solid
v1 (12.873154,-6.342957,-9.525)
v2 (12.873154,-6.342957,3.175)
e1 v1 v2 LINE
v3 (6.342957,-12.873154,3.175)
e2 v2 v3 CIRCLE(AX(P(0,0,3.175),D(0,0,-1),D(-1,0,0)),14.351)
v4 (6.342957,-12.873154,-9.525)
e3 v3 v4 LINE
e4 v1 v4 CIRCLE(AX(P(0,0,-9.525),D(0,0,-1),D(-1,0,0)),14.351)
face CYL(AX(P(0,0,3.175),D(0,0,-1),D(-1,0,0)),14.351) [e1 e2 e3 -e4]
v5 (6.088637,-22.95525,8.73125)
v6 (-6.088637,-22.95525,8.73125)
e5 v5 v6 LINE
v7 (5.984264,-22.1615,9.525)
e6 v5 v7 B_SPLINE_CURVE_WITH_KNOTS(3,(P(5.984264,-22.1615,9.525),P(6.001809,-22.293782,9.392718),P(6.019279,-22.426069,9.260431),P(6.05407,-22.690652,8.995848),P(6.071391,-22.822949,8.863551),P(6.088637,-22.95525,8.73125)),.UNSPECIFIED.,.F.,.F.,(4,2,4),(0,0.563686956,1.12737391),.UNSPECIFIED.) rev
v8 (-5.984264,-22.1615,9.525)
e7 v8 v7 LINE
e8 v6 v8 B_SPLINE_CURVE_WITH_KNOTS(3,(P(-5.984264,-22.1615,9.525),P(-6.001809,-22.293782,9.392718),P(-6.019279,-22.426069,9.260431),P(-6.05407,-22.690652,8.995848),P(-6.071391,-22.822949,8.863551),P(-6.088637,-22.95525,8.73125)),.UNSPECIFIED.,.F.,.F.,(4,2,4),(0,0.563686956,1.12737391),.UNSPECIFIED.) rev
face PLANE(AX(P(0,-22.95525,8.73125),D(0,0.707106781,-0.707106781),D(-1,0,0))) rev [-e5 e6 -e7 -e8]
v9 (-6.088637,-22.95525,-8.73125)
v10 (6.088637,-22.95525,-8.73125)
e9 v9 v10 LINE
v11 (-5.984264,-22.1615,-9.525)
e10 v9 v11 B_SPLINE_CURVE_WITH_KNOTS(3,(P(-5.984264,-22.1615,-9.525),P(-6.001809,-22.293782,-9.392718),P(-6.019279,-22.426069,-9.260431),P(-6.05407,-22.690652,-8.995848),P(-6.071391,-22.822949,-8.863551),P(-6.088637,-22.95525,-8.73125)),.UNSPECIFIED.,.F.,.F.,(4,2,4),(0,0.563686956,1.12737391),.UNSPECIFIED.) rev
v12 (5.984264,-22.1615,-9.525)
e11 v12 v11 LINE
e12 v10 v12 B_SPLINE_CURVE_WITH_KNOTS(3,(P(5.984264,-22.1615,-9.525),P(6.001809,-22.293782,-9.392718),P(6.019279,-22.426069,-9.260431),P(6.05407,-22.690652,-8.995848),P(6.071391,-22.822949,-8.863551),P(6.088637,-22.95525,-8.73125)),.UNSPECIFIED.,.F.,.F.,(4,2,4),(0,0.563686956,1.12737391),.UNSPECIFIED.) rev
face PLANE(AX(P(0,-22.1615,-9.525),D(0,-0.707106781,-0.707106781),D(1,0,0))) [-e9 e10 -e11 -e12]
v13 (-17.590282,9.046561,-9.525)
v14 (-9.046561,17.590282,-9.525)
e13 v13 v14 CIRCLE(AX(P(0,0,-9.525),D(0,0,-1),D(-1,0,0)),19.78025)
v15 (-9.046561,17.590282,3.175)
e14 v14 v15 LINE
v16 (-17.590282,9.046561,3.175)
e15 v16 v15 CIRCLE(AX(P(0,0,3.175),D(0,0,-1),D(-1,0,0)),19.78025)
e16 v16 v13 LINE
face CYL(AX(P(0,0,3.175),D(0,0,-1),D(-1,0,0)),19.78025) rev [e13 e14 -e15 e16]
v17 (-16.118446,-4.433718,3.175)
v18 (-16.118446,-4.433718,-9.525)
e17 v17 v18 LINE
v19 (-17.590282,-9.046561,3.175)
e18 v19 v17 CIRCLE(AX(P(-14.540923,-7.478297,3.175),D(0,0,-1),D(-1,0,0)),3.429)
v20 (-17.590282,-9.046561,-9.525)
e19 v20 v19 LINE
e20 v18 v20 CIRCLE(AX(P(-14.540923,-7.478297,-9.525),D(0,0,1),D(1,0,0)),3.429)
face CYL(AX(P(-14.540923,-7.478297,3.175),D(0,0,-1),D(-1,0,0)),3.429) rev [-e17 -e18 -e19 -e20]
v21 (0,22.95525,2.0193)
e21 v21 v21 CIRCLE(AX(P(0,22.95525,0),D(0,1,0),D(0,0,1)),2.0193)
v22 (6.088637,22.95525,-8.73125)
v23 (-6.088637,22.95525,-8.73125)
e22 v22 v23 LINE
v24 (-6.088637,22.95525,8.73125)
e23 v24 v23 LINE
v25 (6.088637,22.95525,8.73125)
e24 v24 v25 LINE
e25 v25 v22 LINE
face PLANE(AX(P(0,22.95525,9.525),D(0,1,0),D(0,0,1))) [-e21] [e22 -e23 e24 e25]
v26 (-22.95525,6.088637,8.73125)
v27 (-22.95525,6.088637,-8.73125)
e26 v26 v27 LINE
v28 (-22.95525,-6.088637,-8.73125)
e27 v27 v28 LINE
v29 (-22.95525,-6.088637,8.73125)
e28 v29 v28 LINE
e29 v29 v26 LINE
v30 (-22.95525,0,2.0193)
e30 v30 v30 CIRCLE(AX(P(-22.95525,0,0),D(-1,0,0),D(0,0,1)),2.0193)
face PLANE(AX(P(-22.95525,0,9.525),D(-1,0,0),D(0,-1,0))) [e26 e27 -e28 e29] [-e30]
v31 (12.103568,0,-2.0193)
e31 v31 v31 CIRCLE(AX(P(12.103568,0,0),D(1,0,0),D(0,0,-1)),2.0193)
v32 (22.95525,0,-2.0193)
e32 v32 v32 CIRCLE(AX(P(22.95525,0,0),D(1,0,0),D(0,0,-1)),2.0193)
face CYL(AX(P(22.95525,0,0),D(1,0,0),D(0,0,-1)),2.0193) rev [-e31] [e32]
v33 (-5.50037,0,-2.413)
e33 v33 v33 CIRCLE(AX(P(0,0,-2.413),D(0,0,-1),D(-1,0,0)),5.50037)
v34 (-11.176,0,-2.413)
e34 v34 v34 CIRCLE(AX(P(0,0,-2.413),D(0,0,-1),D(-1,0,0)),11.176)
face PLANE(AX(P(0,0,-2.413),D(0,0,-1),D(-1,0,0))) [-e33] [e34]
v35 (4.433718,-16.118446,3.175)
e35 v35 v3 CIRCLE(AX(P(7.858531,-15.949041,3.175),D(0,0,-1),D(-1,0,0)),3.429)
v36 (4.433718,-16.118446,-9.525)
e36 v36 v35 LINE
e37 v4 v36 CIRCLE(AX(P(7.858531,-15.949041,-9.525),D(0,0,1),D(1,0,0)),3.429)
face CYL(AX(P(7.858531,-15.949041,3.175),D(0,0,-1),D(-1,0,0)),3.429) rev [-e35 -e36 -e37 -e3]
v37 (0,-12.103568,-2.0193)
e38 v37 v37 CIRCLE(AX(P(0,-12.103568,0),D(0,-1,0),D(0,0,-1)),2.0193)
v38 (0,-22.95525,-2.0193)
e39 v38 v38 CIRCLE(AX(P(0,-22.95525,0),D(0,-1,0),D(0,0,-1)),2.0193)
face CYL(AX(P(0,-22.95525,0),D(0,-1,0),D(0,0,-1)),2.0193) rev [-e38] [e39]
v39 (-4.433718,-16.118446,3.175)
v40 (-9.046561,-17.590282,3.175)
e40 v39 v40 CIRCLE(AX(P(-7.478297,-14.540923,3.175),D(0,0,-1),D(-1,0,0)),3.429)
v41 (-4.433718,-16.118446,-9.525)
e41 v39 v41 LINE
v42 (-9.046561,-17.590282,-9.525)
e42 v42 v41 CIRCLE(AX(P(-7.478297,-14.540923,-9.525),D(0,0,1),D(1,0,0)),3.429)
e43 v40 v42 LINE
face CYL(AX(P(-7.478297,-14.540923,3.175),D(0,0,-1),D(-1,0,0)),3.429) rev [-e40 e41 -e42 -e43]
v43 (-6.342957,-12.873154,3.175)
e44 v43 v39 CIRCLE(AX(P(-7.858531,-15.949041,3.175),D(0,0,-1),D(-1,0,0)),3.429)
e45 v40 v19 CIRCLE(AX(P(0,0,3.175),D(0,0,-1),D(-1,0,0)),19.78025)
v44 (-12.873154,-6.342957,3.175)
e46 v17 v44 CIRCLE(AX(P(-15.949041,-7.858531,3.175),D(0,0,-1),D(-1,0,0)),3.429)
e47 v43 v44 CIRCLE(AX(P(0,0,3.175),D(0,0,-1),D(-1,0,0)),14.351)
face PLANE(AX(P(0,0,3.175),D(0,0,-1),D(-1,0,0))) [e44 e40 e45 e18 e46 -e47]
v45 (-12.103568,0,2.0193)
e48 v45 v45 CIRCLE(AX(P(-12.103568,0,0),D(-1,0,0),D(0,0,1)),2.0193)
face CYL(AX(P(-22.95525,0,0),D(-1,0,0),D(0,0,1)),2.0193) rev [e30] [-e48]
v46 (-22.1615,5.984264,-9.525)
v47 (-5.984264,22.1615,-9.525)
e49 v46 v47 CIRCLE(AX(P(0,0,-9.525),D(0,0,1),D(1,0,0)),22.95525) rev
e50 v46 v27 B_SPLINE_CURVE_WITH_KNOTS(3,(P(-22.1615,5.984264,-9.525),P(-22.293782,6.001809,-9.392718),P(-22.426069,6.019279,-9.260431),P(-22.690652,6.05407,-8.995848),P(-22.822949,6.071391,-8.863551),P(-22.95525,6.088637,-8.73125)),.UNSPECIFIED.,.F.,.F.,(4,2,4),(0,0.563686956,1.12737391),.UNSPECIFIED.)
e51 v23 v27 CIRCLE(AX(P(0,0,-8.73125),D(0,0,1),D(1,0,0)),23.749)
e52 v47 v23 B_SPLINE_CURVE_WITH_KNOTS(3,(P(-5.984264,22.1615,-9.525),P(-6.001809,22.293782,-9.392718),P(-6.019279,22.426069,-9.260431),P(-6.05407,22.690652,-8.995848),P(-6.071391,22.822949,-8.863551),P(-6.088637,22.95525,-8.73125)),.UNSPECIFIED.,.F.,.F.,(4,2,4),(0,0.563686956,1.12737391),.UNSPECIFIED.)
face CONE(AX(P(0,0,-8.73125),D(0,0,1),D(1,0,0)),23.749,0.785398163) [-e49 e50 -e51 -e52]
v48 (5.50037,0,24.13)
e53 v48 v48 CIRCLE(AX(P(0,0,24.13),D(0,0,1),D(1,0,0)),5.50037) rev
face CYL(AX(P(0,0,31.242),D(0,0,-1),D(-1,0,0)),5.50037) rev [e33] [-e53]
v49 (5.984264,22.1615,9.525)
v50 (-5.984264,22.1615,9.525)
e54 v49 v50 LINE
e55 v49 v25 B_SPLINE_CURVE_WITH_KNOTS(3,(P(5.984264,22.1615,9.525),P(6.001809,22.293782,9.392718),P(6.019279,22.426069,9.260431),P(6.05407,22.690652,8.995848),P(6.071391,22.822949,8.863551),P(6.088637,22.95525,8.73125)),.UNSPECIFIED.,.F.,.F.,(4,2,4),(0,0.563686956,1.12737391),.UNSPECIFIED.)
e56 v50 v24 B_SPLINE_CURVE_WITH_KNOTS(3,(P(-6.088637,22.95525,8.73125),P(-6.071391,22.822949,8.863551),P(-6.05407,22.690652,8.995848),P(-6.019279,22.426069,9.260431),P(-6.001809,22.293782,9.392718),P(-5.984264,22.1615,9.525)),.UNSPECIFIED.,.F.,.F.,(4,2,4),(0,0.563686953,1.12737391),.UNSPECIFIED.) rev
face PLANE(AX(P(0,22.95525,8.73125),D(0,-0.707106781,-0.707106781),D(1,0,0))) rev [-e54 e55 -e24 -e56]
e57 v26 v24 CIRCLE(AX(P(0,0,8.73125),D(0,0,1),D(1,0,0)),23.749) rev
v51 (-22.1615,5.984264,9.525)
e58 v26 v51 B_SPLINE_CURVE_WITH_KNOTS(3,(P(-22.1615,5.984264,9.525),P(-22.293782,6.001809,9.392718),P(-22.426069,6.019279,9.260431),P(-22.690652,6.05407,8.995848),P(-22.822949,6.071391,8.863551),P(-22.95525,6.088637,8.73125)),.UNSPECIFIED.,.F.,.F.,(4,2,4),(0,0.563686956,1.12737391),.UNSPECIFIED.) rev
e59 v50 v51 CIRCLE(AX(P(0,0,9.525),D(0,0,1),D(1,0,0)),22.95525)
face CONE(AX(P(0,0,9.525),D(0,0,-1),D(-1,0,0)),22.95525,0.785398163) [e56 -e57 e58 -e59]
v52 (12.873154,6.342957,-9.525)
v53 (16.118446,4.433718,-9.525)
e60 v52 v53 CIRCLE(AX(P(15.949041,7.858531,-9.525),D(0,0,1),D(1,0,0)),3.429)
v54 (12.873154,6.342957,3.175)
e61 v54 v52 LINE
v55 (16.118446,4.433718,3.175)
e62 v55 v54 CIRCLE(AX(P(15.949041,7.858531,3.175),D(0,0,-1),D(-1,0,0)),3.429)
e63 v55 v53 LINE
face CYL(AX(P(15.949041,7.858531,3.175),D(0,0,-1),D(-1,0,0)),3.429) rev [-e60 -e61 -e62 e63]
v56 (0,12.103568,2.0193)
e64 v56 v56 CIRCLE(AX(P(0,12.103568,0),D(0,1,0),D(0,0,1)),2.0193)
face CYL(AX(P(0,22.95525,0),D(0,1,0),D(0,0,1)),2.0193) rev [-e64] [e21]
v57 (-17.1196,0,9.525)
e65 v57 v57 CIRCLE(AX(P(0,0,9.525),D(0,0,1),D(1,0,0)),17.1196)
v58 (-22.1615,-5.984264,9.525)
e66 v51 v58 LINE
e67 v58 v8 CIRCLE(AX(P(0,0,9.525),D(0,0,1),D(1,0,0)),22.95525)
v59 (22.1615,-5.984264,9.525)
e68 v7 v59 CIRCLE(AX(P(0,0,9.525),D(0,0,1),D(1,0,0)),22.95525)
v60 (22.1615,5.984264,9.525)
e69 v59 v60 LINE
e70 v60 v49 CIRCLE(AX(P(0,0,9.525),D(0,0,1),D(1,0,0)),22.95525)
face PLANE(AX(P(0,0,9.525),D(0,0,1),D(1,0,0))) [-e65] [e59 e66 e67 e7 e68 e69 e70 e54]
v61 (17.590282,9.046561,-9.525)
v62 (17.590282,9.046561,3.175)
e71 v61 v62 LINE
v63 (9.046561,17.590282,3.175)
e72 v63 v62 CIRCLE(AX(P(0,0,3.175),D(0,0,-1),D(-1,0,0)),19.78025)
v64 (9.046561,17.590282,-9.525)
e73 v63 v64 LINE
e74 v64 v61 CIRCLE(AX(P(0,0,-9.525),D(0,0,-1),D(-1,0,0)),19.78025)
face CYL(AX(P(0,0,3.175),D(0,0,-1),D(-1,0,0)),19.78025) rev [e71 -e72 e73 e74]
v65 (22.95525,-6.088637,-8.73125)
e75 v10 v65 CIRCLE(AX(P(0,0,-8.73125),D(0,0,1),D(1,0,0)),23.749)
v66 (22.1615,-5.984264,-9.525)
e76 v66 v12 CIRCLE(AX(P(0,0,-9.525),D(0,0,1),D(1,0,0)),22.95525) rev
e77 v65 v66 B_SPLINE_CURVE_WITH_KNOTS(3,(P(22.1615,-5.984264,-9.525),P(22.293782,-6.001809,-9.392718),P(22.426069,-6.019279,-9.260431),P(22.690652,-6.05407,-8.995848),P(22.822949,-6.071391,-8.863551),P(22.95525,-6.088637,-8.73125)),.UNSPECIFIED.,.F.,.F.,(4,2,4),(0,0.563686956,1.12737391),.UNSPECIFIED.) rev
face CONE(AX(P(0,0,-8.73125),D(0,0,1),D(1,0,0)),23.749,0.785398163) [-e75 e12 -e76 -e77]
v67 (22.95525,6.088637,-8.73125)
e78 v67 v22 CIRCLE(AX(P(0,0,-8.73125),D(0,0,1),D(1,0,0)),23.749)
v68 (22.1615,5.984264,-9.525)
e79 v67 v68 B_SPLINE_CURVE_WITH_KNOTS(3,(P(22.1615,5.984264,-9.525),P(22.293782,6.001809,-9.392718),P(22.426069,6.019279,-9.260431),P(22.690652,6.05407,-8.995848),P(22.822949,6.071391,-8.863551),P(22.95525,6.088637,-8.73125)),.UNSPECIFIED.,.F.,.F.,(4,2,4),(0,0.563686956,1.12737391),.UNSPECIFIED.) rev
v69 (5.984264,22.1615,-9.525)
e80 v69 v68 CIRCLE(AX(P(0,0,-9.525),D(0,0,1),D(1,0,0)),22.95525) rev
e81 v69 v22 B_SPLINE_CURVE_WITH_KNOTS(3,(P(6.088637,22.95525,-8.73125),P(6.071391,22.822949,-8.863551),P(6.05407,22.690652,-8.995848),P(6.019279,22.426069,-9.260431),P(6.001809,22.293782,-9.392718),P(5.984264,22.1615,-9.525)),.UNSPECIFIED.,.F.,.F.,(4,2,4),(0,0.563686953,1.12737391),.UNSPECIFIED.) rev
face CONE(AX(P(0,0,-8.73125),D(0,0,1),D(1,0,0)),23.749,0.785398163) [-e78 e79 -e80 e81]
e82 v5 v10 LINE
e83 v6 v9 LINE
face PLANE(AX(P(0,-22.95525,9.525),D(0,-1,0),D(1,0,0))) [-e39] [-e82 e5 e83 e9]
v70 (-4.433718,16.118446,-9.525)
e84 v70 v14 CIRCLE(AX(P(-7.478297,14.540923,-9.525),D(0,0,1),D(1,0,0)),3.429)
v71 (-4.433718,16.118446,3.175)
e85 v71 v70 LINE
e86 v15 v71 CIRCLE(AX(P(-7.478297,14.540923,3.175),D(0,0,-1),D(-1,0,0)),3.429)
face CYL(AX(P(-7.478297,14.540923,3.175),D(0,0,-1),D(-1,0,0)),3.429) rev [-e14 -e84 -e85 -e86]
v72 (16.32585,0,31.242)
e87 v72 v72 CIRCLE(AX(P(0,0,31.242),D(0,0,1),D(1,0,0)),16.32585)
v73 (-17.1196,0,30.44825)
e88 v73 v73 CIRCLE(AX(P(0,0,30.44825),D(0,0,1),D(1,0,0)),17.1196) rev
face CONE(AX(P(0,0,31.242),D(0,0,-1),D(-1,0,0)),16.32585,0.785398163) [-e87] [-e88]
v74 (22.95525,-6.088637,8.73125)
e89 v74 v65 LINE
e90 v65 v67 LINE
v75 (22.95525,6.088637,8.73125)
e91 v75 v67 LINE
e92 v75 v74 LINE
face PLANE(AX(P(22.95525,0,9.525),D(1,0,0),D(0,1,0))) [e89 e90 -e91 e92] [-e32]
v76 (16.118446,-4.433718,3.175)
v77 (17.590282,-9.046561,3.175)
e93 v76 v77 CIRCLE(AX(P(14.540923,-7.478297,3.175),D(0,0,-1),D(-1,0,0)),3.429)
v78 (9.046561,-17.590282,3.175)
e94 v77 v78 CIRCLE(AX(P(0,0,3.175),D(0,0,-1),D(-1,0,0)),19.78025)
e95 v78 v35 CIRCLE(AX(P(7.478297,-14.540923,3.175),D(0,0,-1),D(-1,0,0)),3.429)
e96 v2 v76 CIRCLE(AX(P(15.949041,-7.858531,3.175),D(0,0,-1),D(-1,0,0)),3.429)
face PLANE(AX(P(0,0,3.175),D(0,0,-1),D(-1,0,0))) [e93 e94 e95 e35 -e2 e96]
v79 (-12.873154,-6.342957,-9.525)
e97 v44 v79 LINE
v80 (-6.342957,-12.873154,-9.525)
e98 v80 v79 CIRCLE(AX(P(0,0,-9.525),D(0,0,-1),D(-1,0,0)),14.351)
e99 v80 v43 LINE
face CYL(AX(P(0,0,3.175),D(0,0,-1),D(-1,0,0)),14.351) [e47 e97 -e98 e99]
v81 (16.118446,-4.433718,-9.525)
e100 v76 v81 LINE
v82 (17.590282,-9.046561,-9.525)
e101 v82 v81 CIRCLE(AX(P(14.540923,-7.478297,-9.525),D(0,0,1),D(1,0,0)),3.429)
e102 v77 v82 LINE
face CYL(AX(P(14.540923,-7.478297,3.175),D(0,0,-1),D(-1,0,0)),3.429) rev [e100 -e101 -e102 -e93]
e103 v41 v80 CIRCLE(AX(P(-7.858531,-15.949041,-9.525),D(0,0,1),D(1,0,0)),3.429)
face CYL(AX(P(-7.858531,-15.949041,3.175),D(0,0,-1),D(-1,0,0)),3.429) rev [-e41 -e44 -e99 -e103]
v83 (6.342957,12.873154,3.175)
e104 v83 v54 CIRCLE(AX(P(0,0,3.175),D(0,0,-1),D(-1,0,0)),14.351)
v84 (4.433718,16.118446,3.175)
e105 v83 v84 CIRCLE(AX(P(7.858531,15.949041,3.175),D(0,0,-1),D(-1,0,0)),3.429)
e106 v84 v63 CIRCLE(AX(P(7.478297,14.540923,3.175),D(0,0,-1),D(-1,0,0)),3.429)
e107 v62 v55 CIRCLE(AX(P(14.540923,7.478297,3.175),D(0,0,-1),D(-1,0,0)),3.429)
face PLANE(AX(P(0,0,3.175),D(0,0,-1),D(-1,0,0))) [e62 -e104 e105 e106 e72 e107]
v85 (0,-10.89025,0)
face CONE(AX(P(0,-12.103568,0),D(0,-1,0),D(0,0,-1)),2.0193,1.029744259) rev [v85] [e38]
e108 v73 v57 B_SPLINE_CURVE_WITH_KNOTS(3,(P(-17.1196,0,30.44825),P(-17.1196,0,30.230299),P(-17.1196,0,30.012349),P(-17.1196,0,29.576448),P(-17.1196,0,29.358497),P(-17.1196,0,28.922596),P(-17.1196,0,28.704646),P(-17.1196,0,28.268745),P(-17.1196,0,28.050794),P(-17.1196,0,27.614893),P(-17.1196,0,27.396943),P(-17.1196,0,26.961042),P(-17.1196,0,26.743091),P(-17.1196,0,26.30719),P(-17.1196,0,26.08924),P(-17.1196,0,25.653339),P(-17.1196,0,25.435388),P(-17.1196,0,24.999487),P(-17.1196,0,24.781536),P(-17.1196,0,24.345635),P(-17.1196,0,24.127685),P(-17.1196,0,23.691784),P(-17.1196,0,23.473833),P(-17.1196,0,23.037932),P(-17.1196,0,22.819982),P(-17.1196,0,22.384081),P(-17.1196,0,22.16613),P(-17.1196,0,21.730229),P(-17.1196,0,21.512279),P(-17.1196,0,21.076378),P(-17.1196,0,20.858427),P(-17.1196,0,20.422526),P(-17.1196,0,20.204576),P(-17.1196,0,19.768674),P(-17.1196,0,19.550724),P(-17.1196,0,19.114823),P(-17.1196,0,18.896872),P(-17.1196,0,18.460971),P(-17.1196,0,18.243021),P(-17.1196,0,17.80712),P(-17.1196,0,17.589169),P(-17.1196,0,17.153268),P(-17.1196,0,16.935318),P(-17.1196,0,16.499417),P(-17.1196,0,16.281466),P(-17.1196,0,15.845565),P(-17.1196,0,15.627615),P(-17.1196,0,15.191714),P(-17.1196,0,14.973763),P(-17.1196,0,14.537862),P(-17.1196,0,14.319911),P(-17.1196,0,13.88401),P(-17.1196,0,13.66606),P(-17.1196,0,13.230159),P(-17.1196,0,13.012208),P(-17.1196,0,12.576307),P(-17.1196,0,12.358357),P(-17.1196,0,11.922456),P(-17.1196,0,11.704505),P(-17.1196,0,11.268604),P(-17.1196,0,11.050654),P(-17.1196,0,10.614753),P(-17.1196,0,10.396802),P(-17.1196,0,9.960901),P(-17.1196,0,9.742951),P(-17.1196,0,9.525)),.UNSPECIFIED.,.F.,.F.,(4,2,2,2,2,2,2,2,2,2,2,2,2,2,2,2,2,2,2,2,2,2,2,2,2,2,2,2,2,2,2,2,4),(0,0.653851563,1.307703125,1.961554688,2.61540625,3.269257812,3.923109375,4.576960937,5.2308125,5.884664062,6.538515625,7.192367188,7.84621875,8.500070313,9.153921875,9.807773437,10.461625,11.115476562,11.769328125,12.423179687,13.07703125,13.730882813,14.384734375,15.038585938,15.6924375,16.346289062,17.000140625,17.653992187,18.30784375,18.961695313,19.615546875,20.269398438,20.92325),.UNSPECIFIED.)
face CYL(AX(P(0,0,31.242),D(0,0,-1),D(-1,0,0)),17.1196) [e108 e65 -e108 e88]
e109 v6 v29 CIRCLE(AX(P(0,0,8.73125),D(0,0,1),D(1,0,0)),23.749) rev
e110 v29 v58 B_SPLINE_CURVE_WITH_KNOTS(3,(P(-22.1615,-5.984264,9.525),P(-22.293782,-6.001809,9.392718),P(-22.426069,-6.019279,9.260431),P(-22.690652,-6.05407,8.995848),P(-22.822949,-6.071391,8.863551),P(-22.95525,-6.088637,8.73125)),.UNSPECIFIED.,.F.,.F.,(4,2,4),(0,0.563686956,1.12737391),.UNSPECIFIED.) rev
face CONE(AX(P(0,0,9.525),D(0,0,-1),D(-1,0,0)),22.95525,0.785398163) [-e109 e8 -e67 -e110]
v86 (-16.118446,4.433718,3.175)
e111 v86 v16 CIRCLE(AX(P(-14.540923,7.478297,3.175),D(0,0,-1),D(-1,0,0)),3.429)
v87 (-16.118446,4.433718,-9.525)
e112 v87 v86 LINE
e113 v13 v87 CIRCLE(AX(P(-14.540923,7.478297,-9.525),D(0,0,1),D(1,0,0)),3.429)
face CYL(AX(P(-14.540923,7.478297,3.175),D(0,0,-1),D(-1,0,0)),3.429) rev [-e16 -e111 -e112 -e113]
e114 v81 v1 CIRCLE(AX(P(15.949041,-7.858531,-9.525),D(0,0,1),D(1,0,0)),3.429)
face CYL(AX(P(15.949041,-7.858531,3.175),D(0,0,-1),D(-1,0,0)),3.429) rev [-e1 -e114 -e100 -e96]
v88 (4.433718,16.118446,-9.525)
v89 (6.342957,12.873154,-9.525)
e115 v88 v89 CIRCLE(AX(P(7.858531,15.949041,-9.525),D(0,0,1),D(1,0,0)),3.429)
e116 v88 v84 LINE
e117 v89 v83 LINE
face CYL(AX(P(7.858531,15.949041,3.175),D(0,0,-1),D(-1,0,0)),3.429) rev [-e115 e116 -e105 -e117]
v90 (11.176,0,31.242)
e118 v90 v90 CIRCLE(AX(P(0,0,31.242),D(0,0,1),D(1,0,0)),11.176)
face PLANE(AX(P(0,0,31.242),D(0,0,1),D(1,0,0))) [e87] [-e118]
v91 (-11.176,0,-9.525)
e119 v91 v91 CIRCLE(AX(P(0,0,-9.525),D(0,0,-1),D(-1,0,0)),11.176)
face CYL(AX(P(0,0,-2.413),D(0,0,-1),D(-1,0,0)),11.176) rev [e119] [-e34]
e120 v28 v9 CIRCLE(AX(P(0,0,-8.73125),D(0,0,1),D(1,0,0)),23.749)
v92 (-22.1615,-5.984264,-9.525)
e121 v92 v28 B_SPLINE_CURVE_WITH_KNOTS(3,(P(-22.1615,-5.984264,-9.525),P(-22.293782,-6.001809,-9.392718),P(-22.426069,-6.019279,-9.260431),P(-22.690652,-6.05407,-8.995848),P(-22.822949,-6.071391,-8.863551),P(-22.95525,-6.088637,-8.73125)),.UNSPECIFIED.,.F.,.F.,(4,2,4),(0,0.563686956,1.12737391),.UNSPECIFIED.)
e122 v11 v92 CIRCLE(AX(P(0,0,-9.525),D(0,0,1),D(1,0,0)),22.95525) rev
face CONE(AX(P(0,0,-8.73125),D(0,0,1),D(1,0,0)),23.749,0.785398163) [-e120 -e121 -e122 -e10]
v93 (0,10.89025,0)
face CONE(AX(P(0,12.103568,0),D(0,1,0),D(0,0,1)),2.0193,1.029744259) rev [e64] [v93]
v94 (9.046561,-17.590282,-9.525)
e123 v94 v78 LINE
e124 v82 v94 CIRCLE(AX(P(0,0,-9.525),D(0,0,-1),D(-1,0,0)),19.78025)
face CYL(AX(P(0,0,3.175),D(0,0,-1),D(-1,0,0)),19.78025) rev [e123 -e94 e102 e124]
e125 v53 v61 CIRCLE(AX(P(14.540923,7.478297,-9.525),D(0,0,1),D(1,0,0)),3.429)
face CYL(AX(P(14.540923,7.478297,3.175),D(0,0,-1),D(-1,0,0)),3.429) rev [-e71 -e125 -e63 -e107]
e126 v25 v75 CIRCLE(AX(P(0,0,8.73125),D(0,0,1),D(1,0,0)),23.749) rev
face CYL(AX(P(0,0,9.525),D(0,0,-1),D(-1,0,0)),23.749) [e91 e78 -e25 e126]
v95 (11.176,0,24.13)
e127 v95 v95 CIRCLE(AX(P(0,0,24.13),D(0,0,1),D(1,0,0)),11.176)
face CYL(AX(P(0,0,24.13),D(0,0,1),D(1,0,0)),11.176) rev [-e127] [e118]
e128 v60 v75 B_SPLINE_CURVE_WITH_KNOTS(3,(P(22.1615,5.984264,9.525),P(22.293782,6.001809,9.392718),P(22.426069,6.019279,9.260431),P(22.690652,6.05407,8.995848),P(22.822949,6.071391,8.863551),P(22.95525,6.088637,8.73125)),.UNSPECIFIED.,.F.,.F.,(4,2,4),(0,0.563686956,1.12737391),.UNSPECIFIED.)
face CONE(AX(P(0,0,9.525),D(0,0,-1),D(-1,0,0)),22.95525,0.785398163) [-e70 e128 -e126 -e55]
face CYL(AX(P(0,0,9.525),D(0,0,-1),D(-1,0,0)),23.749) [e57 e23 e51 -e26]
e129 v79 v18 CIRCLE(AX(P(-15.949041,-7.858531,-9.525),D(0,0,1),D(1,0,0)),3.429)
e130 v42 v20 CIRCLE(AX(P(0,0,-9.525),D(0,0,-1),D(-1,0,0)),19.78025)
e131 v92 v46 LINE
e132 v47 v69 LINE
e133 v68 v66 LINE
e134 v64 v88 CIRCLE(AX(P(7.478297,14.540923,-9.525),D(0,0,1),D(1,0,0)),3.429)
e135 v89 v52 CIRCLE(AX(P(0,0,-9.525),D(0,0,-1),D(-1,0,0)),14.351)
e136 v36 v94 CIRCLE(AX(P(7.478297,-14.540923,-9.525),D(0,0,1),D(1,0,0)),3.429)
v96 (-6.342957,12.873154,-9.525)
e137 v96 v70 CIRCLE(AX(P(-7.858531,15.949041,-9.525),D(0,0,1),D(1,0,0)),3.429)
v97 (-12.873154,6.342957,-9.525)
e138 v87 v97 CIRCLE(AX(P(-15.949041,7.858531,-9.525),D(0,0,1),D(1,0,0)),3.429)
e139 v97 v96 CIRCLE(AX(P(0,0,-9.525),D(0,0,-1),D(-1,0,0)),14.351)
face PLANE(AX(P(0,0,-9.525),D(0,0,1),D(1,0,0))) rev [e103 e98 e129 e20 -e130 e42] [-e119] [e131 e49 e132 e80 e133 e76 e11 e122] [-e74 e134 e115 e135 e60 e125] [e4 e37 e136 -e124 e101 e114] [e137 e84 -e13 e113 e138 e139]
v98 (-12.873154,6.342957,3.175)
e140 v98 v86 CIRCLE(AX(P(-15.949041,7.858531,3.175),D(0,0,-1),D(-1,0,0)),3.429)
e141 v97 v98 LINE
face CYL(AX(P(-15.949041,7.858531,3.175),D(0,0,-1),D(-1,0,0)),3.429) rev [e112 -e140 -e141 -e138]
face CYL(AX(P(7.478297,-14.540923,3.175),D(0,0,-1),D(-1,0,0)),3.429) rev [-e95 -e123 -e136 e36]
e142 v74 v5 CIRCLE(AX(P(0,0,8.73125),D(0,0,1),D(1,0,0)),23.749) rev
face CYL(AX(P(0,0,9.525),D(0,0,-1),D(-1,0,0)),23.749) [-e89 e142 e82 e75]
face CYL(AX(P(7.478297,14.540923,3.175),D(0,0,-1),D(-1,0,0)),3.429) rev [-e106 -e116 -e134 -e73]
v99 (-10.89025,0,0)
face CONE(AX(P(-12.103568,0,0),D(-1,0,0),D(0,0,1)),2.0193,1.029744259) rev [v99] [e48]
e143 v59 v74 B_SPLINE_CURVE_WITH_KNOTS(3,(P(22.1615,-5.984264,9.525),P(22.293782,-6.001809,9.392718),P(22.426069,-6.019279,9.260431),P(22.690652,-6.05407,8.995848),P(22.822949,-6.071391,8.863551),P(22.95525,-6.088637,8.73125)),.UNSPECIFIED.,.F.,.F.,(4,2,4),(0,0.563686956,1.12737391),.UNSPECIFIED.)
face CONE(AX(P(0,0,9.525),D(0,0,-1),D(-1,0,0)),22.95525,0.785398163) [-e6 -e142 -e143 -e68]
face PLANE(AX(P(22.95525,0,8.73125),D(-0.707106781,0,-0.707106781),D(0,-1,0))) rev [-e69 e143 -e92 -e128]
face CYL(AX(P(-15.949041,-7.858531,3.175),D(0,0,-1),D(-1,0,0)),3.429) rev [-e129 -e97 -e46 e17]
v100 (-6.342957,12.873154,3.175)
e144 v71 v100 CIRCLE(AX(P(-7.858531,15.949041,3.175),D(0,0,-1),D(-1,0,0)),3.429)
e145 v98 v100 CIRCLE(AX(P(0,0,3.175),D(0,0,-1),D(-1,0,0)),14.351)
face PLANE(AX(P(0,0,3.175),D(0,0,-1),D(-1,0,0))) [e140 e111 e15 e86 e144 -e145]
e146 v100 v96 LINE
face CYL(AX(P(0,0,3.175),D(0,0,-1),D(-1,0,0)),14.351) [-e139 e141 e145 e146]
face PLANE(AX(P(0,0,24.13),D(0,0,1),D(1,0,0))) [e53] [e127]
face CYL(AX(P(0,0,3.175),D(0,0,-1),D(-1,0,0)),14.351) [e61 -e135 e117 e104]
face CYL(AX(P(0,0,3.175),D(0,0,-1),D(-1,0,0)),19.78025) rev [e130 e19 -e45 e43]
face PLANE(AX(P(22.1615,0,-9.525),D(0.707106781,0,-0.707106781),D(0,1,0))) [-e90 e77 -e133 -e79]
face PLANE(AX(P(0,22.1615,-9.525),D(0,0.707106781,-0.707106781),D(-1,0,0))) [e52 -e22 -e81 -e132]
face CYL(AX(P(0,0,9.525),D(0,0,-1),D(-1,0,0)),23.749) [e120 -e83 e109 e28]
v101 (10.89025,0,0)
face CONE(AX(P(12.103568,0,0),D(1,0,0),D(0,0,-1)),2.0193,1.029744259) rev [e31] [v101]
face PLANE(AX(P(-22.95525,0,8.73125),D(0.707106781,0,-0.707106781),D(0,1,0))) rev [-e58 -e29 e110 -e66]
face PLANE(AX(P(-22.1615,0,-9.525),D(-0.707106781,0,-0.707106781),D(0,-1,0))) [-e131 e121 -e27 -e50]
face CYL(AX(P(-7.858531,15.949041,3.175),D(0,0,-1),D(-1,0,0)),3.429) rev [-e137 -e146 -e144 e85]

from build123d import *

# Parameters (mm, degrees)
BOSS_EXTRUDE1_DEPTH = 9.525
SKETCH2_R           = 11.176
SKETCH2_R_2         = 5.500370000000001
CUT_EXTRUDE1_DEPTH  = 7.112
SKETCH3_R           = 17.119600000000002
BOSS_EXTRUDE2_DEPTH = 21.717
SKETCH2_3_R         = 5.500370000000001
CUT_EXTRUDE2_DEPTH  = 53.11367665138399
CUT_EXTRUDE3_START  = -7.112
SKETCH4_R           = 11.176
CUT_EXTRUDE3_DEPTH  = 7.112
CIRPATTERN1_COUNT   = 4
CHAMFER2_SIZE       = 0.79375
CUT_EXTRUDE4_DEPTH  = 12.7
FILLET2_R           = 3.429


# Some blends are built 0.0001 mm under size
with BuildPart() as part:
    # Sketch1 → Boss-Extrude1 (new, symmetric)
    with BuildSketch(Plane.XY):
        with BuildLine():
            Line((6.0886368291679185, 22.95525), (-6.0886368291679185, 22.95525))
            ThreePointArc((-6.088636829167921, 22.955250000000003), (-16.793078946399227, 16.793078946399408), (-22.95524999999994, 6.088636829168165))
            Line((-22.95524999999994, 6.08863682916816), (-22.955250000000003, 0))
            Line((-22.955250000000003, 0), (22.95525, 0))
            Line((22.95525, 0), (22.95525000000002, 6.088636829167839))
            ThreePointArc((22.955250000000024, 6.088636829167841), (16.793078946399348, 16.79307894639929), (6.0886368291679185, 22.955250000000003))
        make_face()
        with BuildLine():
            Line((22.95525, 0), (-22.955250000000003, 0))
            Line((-22.955250000000003, 0), (-22.955250000000063, -6.088636829167679))
            ThreePointArc((-22.955250000000067, -6.0886368291676805), (-16.79307894639947, -16.793078946399167), (-6.088636829168085, -22.95524999999996))
            Line((-6.088636829168078, -22.955249999999957), (6.08863682916776, -22.955250000000042))
            ThreePointArc((6.08863682916775, -22.955250000000046), (16.793078946399223, -16.79307894639941), (22.95524999999998, -6.088636829168005))
            Line((22.955249999999978, -6.088636829167999), (22.95525, 0))
        make_face()
    extrude(amount=BOSS_EXTRUDE1_DEPTH, both=True)

    # Sketch2 → Cut-Extrude1 (cut)
    # profile 1 of 2: a face of its own
    with BuildSketch(Plane(origin=(0, 0, -9.525), x_dir=(-1, 0, 0), z_dir=(0, 0, -1))):
        Circle(SKETCH2_R)
        Circle(SKETCH2_R_2, mode=Mode.SUBTRACT)
    # profile 2 of 2: a face of its own
    with BuildSketch(Plane(origin=(0, 0, -9.525), x_dir=(-1, 0, 0), z_dir=(0, 0, -1))):
        Circle(SKETCH2_R_2)
    extrude(amount=-CUT_EXTRUDE1_DEPTH, mode=Mode.SUBTRACT)

    # Sketch3 → Boss-Extrude2 (add)
    with BuildSketch(Plane.XY.offset(9.525)):
        with Locations(Location((0, 0, 0), (0, 0, 180))):
            Circle(SKETCH3_R)
    extrude(amount=BOSS_EXTRUDE2_DEPTH)

    # Sketch2<3> → Cut-Extrude2 (cut, through all)
    with BuildSketch(Plane(origin=(0, 0, -9.525), x_dir=(-1, 0, 0), z_dir=(0, 0, -1))):
        Circle(SKETCH2_3_R)
    extrude(amount=-CUT_EXTRUDE2_DEPTH, mode=Mode.SUBTRACT)

    # Sketch4 → Cut-Extrude3 (cut)
    with BuildSketch(Plane.XY.offset(31.241999999999997).offset(CUT_EXTRUDE3_START)):
        with Locations(Location((0, 0, 0), (0, 0, 180))):
            Circle(SKETCH4_R)
    extrude(amount=CUT_EXTRUDE3_DEPTH, mode=Mode.SUBTRACT)

    # Sketch7 → #10-32 Tapped Hole1 (revolve, cut)
    with BuildSketch(Plane(origin=(-22.95525, 2.3545e-13, 0), x_dir=(0, 0, 1), z_dir=(1.026e-14, 1, 0))):
        Polygon((0, 0), (-3.04e-15, 12.065), (2.019299999999997, 10.851682151997645), (2.0192999999999897, -1.31e-15), align=None)
    f_10_32_tapped_hole1 = revolve(axis=Axis((-29.30524999999999, 3.0058e-13, 0), (1, -1.026e-14, 0)), mode=Mode.SUBTRACT)

    # CirPattern1: #10-32 Tapped Hole1 ×4 about axis
    cirpattern1_axis = Axis((0, 0, 31.241999999999997), (0, 0, 1))
    for i in range(1, CIRPATTERN1_COUNT):
        add(f_10_32_tapped_hole1.rotate(cirpattern1_axis, i * 360 / CIRPATTERN1_COUNT), mode=Mode.SUBTRACT)

    # Chamfer2
    chamfer2_edges = [part.edges().sort_by_distance(p)[0] for p in [
        (16.793078946399344, 16.79307894639929, -9.525),
        (22.95525, -8.171e-14, -9.525),
        (-16.793078946399465, -16.79307894639917, 9.525),
        (16.793078946399223, -16.79307894639941, -9.525),
        (-1.5898e-13, -22.95525, -9.525),
        (-16.793078946399465, -16.79307894639917, -9.525),
        (-22.955250000000003, 2.407e-13, -9.525),
        (-1.5898e-13, -22.95525, 9.525),
        (16.793078946399223, -16.79307894639941, 9.525),
        (22.95525, -8.082e-14, 9.525),
        (16.793078946399344, 16.79307894639929, 9.525),
        (17.119600000000002, -4.19e-15, 31.241999999999997),
        (0, 22.95525, 9.525),
        (-16.79307894639923, 16.79307894639941, 9.525),
        (-22.955250000000003, 2.4158e-13, 9.525),
        (-16.79307894639923, 16.79307894639941, -9.525),
        (0, 22.95525, -9.525),
    ]]
    chamfer(chamfer2_edges, length=CHAMFER2_SIZE - 0.0001)  # a hair under: the kernel refuses the full size

    # Sketch8 → Cut-Extrude4 (cut)
    with BuildSketch(Plane(origin=(0, 0, -9.525), x_dir=(-1, 0, 0), z_dir=(0, 0, -1))):
        with BuildLine():
            ThreePointArc((-3.7411998688127595, -13.854769017980608), (-10.14768941680823, -10.147689416808056), (-13.854769017980674, -3.741199868812521))
            Line((-13.854769017980672, -3.7411998688125214), (-19.096285615491066, -5.156565305907526))
            ThreePointArc((-19.096285615491066, -5.1565653059075265), (-13.986748908565335, -13.98674890856509), (-5.156565305907854, -19.09628561549097))
            Line((-5.156565305907857, -19.096285615490967), (-3.741199868812765, -13.854769017980608))
        make_face()
        with BuildLine():
            ThreePointArc((13.854769017980626, -3.7411998688126986), (10.147689416808095, -10.14768941680819), (3.741199868812558, -13.854769017980665))
            Line((3.7411998688125703, -13.854769017980663), (5.156565305907591, -19.09628561549104))
            ThreePointArc((5.156565305907593, -19.096285615491045), (13.986748908565135, -13.986748908565279), (19.09628561549099, -5.156565305907787))
            Line((19.096285615490988, -5.1565653059077885), (13.854769017980622, -3.741199868812714))
        make_face()
        with BuildLine():
            Line((5.156565305907724, 19.096285615491006), (3.741199868812667, 13.854769017980631))
            ThreePointArc((3.7411998688126653, 13.854769017980633), (10.147689416808161, 10.147689416808124), (13.854769017980649, 3.741199868812616))
            Line((13.854769017980647, 3.741199868812618), (19.096285615491023, 5.156565305907658))
            ThreePointArc((19.096285615491027, 5.15656530590766), (13.98674890856523, 13.986748908565183), (5.156565305907728, 19.09628561549101))
        make_face()
        with BuildLine():
            ThreePointArc((-5.1565653059077246, 19.096285615491006), (-13.986748908565236, 13.986748908565183), (-19.096285615491023, 5.1565653059076535))
            Line((-19.096285615491023, 5.156565305907655), (-13.854769017980647, 3.7411998688126173))
            ThreePointArc((-13.854769017980647, 3.741199868812617), (-10.14768941680816, 10.147689416808126), (-3.741199868812667, 13.854769017980633))
            Line((-3.741199868812666, 13.854769017980635), (-5.1565653059077246, 19.096285615491006))
        make_face()
    extrude(amount=-CUT_EXTRUDE4_DEPTH, mode=Mode.SUBTRACT)

    # Fillet2
    # the kernel refuses this fillet: 3.429 mm, written as the material it adds along each edge
    with BuildSketch(Plane(origin=(-5.156565305907593, -19.096285615491045, -9.525), x_dir=(-0.9325520544220317, 0.3610355464400257, 0), z_dir=(0, 0, 1))) as fillet2_piece_1:
        with BuildLine():
            CenterArc((3.8097835082284277, -3.409884824393312), FILLET2_R, 83.94735795443728, 102.10528409112533)
            Line((0.39989868383511423, -3.771446000921142), (0, 0))
            ThreePointArc((0, 0), (2.085672342378129, 0.11026624447191213), (4.171344684756262, 8e-17))
        make_face()
    extrude(amount=12.7)
    with BuildSketch(Plane(origin=(-19.096285615491027, 5.15656530590766, -9.525), x_dir=(0.965421853388659, -0.26069262551826505, 0), z_dir=(0, 0, 1))) as fillet2_piece_2:
        with BuildLine():
            CenterArc((3.792588020758013, 3.4290000000000003), FILLET2_R, 167.8947159088747, 102.10528409112533)
            ThreePointArc((0.4398356056936713, 4.148091262135922), (0.11026624447190661, 2.0856723423781296), (0, 0))
            Line((0, 0), (3.7925880207580134, -5e-17))
        make_face()
    extrude(amount=12.7)
    with BuildSketch(Plane(origin=(-5.156565305907726, 19.096285615491006, -9.525), x_dir=(0.26069262551826866, -0.9654218533886582, 0), z_dir=(0, 0, 1))) as fillet2_piece_3:
        with BuildLine():
            CenterArc((3.792588020758004, -3.4290000000000003), FILLET2_R, 89.99999999999996, 102.10528409112538)
            ThreePointArc((0.4398356056936635, -4.148091262135923), (0.11026624447190603, -2.0856723423781314), (0, 0))
            Line((0, 0), (3.7925880207580063, -7e-17))
        make_face()
    extrude(amount=12.7)
    with BuildSketch(Plane(origin=(-13.854769017980626, -3.741199868812707, -9.525), x_dir=(-0.9654218533886567, -0.26069262551827366, 0), z_dir=(0, 0, 1))) as fillet2_piece_4:
        with BuildLine():
            CenterArc((3.095213314069055, 3.4289999999999994), FILLET2_R, 191.11957095345258, 78.88042904654725)
            ThreePointArc((-0.2694135393585486, 2.7676928571428627), (-0.06751218545229558, 1.3903873027568008), (0, 0))
            Line((0, 0), (3.095213314069046, -1e-16))
        make_face()
    extrude(amount=12.7)
    with BuildSketch(Plane(origin=(-19.09628561549099, -5.156565305907787, -9.525), x_dir=(0.9654218533886576, 0.26069262551827094, 0), z_dir=(0, 0, 1))) as fillet2_piece_5:
        with BuildLine():
            CenterArc((3.7925880207580076, -3.4290000000000007), FILLET2_R, 90.00000000000001, 102.10528409112538)
            ThreePointArc((0.439835605693668, -4.148091262135926), (0.11026624447190793, -2.0856723423781336), (0, 0))
            Line((0, 0), (3.792588020758007, 3e-17))
        make_face()
    extrude(amount=12.7)
    with BuildSketch(Plane(origin=(-3.741199868812565, -13.854769017980665, -9.525), x_dir=(-0.2606926255182637, -0.9654218533886595, 0), z_dir=(0, 0, 1))) as fillet2_piece_6:
        with BuildLine():
            CenterArc((3.095213314069052, -3.429), FILLET2_R, 90.00000000000011, 78.88042904654733)
            ThreePointArc((-0.26941353935855195, -2.7676928571428654), (-0.06751218545229434, -1.3903873027568034), (0, 0))
            Line((0, 0), (3.095213314069045, 2e-17))
        make_face()
    extrude(amount=12.7)
    with BuildSketch(Plane(origin=(5.156565305907854, -19.09628561549097, -9.525), x_dir=(0.9325520544220268, 0.36103554644003844, 0), z_dir=(0, 0, 1))) as fillet2_piece_7:
        with BuildLine():
            CenterArc((3.8097835082284335, 3.409884824393312), FILLET2_R, 173.94735795443748, 102.10528409112516)
            Line((0.3998986838351195, 3.7714460009211352), (0, 0))
            ThreePointArc((0, 0), (2.0856723423781314, -0.11026624447191156), (4.171344684756263, -1.5e-16))
        make_face()
    extrude(amount=12.7)
    with BuildSketch(Plane(origin=(3.741199868812762, -13.854769017980608, -9.525), x_dir=(0.9356231316515913, 0.3530005035668774, 0), z_dir=(0, 0, 1))) as fillet2_piece_8:
        with BuildLine():
            CenterArc((3.112991040685577, -3.412868769847682), FILLET2_R, 95.55978547672635, 78.88042904654728)
            Line((-0.29987772916210453, -3.080652334675703), (0, 0))
            ThreePointArc((0, 0), (1.3903873027568012, -0.06751218545229684), (2.7807746055135993, 2e-17))
        make_face()
    extrude(amount=12.7)
    with BuildSketch(Plane(origin=(19.096285615491063, -5.156565305907526, -9.525), x_dir=(-0.36103554644002145, -0.9325520544220334, 0), z_dir=(0, 0, 1))) as fillet2_piece_9:
        with BuildLine():
            CenterArc((3.8097835082284273, -3.4098848243933118), FILLET2_R, 83.94735795443727, 102.10528409112533)
            Line((0.39989868383511423, -3.771446000921139), (0, 0))
            ThreePointArc((0, 0), (2.08567234237813, 0.11026624447191419), (4.171344684756262, 9e-17))
        make_face()
    extrude(amount=12.7)
    with BuildSketch(Plane(origin=(13.854769017980672, -3.741199868812522, -9.525), x_dir=(0.9654218533886609, -0.2606926255182579, 0), z_dir=(0, 0, 1))) as fillet2_piece_10:
        with BuildLine():
            CenterArc((3.095213314069046, -3.4289999999999994), FILLET2_R, 89.99999999999999, 78.88042904654729)
            ThreePointArc((-0.26941353935855583, -2.7676928571428556), (-0.06751218545229619, -1.3903873027567997), (0, 0))
            Line((0, 0), (3.0952133140690474, 2e-17))
        make_face()
    extrude(amount=12.7)
    with BuildSketch(Plane(origin=(13.854769017980647, 3.7411998688126173, -9.525), x_dir=(-0.3530005035668672, 0.9356231316515952, 0), z_dir=(0, 0, 1))) as fillet2_piece_11:
        with BuildLine():
            CenterArc((3.1129910406855728, -3.412868769847681), FILLET2_R, 95.55978547672636, 78.88042904654723)
            Line((-0.29987772916210814, -3.0806523346756998), (0, 0))
            ThreePointArc((0, 0), (1.3903873027567972, -0.06751218545229692), (2.780774605513595, -5e-17))
        make_face()
    extrude(amount=12.7)
    with BuildSketch(Plane(origin=(19.09628561549102, 5.1565653059076535, -9.525), x_dir=(-0.9654218533886593, -0.2606926255182644, 0), z_dir=(0, 0, 1))) as fillet2_piece_12:
        with BuildLine():
            CenterArc((3.7925880207580005, -3.429), FILLET2_R, 90.00000000000001, 102.10528409112527)
            ThreePointArc((0.4398356056936603, -4.148091262135919), (0.11026624447190564, -2.0856723423781256), (0, 0))
            Line((0, 0), (3.792588020758, -7e-17))
        make_face()
    extrude(amount=12.7)
    with BuildSketch(Plane(origin=(3.7411998688126658, 13.854769017980633, -9.525), x_dir=(0.9356231316515938, -0.35300050356687046, 0), z_dir=(0, 0, 1))) as fillet2_piece_13:
        with BuildLine():
            CenterArc((3.1129910406855763, 3.412868769847681), FILLET2_R, 185.55978547672632, 78.8804290465473)
            Line((-0.29987772916210376, 3.080652334675704), (0, 0))
            ThreePointArc((0, 0), (1.3903873027567977, 0.06751218545229833), (2.780774605513599, 1.1e-16))
        make_face()
    extrude(amount=12.7)
    with BuildSketch(Plane(origin=(5.1565653059077246, 19.096285615491006, -9.525), x_dir=(0.9325520544220295, -0.3610355464400313, 0), z_dir=(0, 0, 1))) as fillet2_piece_14:
        with BuildLine():
            CenterArc((3.8097835082284233, -3.4098848243933118), FILLET2_R, 83.9473579544373, 102.10528409112527)
            Line((0.39989868383510974, -3.7714460009211384), (0, 0))
            ThreePointArc((0, 0), (2.0856723423781274, 0.11026624447191274), (4.171344684756256, -2e-17))
        make_face()
    extrude(amount=12.7)
    with BuildSketch(Plane(origin=(-13.854769017980647, 3.7411998688126173, -9.525), x_dir=(-0.965421853388659, 0.26069262551826505, 0), z_dir=(0, 0, 1))) as fillet2_piece_15:
        with BuildLine():
            CenterArc((3.095213314069046, -3.429), FILLET2_R, 90, 78.8804290465473)
            ThreePointArc((-0.26941353935855566, -2.7676928571428574), (-0.06751218545229724, -1.390387302756799), (0, 0))
            Line((0, 0), (3.095213314069046, 7e-17))
        make_face()
    extrude(amount=12.7)
    with BuildSketch(Plane(origin=(-3.741199868812666, 13.854769017980633, -9.525), x_dir=(-0.9356231316515938, -0.35300050356687074, 0), z_dir=(0, 0, 1))) as fillet2_piece_16:
        with BuildLine():
            CenterArc((3.1129910406855745, -3.4128687698476816), FILLET2_R, 95.55978547672635, 78.8804290465473)
            Line((-0.2998777291621067, -3.0806523346757038), (0, 0))
            ThreePointArc((0, 0), (1.3903873027567981, -0.0675121854522969), (2.780774605513597, 1e-17))
        make_face()
    extrude(amount=12.7)


solid = part.part
